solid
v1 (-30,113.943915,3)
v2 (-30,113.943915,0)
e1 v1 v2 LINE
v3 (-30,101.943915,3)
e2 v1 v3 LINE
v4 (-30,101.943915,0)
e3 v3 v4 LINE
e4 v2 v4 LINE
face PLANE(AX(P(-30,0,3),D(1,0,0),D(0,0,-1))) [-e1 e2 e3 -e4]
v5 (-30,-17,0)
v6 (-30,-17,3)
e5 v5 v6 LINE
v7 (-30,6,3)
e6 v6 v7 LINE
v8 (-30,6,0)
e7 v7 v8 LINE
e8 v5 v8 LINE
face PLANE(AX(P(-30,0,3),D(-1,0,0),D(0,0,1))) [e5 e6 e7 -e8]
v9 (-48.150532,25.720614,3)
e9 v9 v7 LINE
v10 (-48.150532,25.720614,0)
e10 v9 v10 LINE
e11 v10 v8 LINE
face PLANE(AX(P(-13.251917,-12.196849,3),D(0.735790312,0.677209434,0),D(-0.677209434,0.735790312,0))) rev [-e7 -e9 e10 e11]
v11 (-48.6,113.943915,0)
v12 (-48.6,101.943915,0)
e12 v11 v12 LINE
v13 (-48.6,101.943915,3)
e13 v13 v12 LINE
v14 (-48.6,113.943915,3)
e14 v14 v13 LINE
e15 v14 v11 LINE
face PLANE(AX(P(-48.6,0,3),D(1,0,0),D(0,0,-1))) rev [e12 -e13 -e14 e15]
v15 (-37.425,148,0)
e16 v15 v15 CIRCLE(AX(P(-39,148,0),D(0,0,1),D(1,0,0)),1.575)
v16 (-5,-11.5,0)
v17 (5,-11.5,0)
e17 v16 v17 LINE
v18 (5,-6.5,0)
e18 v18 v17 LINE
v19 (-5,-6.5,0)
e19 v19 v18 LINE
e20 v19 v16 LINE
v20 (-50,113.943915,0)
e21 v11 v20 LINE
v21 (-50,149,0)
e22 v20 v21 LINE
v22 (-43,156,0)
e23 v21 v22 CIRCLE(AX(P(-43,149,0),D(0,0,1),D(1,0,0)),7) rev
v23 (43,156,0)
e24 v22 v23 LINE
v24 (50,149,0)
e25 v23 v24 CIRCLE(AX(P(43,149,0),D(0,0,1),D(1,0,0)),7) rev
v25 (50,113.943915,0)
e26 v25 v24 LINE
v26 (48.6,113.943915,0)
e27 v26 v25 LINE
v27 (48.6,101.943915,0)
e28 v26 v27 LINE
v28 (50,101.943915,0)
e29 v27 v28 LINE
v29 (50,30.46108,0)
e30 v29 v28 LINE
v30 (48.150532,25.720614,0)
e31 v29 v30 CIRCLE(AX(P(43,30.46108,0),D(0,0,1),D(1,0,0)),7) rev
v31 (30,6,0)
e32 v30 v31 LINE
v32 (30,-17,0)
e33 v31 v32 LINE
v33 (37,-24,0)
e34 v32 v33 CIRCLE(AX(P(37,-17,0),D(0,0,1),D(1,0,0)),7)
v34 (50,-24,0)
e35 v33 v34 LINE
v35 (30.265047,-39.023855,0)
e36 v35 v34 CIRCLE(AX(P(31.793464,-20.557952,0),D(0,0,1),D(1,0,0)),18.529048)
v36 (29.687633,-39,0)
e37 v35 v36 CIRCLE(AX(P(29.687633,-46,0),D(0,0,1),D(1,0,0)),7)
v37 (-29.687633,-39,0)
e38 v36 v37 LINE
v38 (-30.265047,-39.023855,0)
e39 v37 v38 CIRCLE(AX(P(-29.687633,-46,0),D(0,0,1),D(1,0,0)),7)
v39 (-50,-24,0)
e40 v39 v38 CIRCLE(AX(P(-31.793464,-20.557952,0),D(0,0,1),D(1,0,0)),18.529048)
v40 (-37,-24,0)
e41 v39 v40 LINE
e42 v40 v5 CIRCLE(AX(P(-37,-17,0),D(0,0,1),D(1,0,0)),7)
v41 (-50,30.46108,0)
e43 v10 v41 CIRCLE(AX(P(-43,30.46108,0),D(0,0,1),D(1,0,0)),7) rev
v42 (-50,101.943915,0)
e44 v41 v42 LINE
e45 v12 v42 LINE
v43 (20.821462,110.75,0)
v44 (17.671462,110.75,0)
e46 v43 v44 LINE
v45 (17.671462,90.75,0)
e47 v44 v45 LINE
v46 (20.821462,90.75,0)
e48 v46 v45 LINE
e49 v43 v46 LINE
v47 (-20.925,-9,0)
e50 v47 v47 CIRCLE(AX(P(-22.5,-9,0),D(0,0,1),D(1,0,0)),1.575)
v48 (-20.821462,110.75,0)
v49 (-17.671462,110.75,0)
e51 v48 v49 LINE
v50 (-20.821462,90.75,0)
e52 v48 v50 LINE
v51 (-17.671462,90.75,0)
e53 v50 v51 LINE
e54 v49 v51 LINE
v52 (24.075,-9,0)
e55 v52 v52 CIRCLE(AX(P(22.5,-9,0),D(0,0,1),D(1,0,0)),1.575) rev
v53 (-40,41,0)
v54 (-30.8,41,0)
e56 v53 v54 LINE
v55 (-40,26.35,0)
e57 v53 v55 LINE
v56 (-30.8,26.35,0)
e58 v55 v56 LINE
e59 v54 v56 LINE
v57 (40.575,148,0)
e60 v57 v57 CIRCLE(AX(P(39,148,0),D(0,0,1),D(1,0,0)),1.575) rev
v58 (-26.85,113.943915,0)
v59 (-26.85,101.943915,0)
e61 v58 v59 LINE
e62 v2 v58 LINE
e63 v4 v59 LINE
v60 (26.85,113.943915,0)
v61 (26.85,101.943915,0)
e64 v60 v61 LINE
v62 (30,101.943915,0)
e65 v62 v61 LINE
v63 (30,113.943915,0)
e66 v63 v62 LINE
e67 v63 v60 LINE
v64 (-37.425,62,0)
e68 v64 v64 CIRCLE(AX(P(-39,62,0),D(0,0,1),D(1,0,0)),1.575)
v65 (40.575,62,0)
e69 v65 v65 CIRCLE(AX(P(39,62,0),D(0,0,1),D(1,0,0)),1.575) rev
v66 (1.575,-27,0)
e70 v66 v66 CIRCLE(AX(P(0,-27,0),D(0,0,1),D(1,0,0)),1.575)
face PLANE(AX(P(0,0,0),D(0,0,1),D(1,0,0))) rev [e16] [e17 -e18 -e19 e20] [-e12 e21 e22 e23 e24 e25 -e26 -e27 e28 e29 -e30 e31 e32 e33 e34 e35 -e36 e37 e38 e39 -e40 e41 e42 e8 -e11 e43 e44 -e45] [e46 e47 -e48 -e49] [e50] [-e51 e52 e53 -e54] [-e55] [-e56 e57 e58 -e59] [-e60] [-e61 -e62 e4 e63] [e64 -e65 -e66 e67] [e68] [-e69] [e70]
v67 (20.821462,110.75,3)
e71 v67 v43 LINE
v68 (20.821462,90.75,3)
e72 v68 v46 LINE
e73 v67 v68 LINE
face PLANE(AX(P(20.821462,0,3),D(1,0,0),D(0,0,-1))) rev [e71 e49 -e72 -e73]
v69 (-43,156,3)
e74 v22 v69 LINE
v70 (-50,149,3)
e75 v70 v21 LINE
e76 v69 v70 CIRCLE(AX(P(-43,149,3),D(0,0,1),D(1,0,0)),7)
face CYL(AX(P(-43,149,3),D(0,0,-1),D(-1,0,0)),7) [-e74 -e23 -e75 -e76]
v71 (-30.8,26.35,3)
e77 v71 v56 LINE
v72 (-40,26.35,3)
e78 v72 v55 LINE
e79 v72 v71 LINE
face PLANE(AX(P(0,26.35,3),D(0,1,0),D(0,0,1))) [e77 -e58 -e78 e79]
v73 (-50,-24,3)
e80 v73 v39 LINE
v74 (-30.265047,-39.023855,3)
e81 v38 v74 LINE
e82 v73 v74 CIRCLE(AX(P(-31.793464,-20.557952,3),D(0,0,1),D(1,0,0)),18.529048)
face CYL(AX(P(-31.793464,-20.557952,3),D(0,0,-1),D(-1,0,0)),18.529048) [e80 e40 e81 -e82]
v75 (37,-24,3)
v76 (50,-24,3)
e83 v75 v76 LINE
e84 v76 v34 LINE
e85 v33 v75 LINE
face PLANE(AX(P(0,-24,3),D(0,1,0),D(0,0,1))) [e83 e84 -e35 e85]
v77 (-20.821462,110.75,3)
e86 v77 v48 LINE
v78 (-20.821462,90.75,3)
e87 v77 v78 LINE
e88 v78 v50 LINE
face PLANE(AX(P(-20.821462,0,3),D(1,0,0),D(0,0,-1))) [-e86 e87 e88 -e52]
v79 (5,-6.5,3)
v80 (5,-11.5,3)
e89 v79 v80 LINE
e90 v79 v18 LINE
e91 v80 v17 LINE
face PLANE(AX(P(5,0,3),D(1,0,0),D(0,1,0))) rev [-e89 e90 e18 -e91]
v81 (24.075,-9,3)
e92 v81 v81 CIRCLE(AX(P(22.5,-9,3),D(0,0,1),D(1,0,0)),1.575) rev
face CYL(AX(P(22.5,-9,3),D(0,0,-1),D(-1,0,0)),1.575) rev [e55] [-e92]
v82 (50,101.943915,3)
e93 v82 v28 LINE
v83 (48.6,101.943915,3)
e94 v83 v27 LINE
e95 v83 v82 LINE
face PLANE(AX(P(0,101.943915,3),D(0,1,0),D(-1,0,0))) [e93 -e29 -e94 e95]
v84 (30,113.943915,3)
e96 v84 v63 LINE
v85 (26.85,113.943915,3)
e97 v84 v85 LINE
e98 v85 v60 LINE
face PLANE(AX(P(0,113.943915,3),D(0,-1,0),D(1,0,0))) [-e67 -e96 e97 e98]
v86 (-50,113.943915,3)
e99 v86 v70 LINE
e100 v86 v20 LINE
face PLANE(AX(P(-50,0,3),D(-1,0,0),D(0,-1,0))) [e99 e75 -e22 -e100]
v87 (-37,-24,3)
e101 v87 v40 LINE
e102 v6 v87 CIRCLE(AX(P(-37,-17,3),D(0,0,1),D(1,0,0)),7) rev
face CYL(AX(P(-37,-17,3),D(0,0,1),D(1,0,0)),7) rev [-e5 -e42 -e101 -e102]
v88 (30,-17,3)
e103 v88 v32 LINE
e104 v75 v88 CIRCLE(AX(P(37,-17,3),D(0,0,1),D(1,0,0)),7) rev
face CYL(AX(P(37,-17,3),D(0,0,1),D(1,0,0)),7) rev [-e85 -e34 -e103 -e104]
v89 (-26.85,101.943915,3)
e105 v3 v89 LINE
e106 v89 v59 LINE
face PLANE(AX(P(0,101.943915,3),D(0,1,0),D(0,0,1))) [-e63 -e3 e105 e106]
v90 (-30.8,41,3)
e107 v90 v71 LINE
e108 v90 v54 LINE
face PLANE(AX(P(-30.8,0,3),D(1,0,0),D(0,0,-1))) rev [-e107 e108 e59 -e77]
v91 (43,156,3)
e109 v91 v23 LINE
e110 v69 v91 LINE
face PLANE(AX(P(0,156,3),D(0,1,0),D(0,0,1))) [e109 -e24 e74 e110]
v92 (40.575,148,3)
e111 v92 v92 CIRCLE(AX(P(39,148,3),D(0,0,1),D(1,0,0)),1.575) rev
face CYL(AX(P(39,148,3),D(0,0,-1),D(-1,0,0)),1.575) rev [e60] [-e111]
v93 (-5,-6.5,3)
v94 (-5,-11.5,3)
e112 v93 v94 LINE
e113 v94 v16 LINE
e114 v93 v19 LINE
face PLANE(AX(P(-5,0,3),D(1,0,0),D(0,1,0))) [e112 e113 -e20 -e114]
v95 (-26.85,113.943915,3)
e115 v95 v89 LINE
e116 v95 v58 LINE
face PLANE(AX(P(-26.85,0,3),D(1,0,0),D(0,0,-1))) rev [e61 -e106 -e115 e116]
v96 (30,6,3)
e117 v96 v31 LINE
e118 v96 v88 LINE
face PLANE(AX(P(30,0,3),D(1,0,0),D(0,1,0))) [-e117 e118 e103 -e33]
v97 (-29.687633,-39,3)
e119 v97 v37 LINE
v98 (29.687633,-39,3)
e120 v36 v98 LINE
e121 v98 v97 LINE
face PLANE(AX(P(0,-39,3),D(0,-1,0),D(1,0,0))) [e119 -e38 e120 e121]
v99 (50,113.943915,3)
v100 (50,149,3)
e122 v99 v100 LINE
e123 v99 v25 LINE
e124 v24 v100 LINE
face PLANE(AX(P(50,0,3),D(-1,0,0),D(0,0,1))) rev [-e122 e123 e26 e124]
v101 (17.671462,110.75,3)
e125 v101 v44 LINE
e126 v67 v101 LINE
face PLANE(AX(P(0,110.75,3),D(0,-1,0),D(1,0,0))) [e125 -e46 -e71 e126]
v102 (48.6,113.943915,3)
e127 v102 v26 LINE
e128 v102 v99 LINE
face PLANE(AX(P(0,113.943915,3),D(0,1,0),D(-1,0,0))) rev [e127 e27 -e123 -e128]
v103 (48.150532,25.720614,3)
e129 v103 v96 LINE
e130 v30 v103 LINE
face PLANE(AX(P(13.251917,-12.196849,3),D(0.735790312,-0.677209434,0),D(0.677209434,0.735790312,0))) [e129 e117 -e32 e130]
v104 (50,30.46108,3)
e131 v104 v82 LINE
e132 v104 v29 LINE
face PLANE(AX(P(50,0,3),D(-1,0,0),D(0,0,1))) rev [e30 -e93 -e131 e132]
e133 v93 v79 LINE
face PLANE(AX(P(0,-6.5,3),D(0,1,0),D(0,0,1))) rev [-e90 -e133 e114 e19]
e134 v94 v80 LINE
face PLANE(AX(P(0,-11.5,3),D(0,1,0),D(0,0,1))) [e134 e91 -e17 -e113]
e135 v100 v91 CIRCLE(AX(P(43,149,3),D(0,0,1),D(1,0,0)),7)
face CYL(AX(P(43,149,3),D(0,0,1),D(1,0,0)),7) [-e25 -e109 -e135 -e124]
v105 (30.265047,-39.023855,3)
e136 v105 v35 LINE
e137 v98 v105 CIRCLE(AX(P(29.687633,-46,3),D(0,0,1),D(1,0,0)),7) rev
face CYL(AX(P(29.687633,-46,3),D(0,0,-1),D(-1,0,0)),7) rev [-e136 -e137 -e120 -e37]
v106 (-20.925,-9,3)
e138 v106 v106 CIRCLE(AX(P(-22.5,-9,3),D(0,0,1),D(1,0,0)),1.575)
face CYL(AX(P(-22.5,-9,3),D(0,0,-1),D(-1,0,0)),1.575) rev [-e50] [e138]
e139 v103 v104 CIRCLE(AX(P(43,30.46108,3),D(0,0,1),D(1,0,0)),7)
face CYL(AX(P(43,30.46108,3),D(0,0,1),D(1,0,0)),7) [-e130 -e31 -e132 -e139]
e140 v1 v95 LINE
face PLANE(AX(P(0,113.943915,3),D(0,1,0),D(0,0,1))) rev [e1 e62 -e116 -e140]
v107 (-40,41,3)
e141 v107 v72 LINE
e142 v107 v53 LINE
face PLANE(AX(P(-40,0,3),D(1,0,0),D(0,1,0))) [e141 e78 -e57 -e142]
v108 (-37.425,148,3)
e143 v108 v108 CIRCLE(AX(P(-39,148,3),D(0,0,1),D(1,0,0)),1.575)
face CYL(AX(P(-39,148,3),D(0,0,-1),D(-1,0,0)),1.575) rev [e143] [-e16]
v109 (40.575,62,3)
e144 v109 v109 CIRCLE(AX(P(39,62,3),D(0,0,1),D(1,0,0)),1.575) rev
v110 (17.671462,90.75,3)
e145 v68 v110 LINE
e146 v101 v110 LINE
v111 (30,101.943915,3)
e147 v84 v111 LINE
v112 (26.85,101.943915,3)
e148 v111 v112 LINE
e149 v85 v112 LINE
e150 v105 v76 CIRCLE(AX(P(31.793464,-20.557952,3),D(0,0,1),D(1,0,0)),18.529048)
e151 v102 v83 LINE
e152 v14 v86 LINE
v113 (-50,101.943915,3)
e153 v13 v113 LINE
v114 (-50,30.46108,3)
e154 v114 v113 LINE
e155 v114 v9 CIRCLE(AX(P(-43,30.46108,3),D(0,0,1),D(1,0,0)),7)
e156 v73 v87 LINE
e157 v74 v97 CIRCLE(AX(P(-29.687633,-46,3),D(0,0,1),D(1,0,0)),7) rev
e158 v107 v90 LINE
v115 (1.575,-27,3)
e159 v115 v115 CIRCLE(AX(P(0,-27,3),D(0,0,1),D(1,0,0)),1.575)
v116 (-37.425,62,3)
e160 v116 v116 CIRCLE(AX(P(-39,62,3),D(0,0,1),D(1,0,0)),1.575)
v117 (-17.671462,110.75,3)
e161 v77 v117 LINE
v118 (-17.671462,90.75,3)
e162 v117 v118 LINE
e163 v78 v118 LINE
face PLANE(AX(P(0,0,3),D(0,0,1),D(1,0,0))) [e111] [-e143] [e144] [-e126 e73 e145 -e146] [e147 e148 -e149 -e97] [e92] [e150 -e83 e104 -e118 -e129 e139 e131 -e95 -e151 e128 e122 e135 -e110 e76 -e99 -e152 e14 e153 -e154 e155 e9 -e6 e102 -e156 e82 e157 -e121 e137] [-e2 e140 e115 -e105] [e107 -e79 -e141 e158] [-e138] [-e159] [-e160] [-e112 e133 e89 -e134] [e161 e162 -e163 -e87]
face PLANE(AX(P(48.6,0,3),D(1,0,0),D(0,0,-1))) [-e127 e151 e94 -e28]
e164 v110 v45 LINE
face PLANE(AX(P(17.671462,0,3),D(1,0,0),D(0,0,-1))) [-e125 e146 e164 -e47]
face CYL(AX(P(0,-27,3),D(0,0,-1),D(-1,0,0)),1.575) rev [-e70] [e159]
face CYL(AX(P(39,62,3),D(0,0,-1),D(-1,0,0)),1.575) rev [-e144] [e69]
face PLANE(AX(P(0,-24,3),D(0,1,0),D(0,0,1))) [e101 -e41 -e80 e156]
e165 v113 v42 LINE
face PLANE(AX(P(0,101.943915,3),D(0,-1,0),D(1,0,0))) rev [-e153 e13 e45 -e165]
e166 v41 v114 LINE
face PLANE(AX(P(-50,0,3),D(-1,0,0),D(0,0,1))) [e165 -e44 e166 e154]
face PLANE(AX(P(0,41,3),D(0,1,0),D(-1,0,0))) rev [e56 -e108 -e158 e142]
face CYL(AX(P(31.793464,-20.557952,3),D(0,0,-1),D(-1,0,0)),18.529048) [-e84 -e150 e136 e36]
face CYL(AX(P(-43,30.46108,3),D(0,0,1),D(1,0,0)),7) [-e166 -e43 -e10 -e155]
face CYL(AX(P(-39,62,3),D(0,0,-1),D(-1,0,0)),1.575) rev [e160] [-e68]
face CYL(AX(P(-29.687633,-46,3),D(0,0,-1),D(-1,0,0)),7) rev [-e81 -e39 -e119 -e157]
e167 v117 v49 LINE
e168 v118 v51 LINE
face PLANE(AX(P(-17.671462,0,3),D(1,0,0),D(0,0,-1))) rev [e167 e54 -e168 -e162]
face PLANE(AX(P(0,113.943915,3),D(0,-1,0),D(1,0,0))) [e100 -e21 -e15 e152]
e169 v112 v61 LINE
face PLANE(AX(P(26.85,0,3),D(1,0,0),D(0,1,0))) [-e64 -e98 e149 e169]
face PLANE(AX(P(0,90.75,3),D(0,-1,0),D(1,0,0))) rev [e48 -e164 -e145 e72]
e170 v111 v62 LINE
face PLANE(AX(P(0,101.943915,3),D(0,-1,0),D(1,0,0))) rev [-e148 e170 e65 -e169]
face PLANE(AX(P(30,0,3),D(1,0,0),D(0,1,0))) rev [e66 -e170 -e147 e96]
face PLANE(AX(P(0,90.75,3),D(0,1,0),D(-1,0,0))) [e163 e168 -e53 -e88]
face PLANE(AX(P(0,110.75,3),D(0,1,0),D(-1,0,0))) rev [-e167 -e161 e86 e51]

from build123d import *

# Parameters (mm, degrees)
SKETCH1_W           = 9.2
SKETCH1_H           = 14.65
SKETCH1_R           = 1.575
SKETCH1_W_2         = 10
SKETCH1_H_2         = 5
SKETCH1_W_3         = 3.15
SKETCH1_H_3         = 20
SKETCH1_H_4         = 12
BOSS_EXTRUDE2_DEPTH = 3
FILLET1_R           = 7


with BuildPart() as part:
    # Sketch1 → Boss-Extrude2 (new body)
    with BuildSketch(Plane.XY):
        with BuildLine():
            Line((-30, -39), (30, -39))
            ThreePointArc((30, -39), (42.910893348, -35.38119113), (50, -24))
            Line((50, -24), (30, -24))
            Line((30, -24), (30, 6))
            Line((30, 6), (50, 27.730066792))
            Line((50, 27.730066792), (50, 101.943914812))
            Line((50, 101.943914812), (48.6, 101.943914812))
            Line((48.6, 101.943914812), (48.6, 113.943914812))
            Line((48.6, 113.943914812), (50, 113.943914812))
            Line((50, 113.943914812), (50, 156))
            Line((50, 156), (-50, 156))
            Line((-50, 156), (-50, 113.943914812))
            Line((-50, 113.943914812), (-48.6, 113.943914812))
            Line((-48.6, 113.943914812), (-48.6, 101.943914812))
            Line((-48.6, 101.943914812), (-50, 101.943914812))
            Line((-50, 101.943914812), (-50, 27.730066792))
            Line((-50, 27.730066792), (-30, 6))
            Line((-30, 6), (-30, -24))
            Line((-30, -24), (-50, -24))
            ThreePointArc((-50, -24), (-42.910893348, -35.38119113), (-30, -39))
        make_face()
        with Locations((-35.4, 33.675)):
            Rectangle(SKETCH1_W, SKETCH1_H, mode=Mode.SUBTRACT)
        with Locations((0, -27)):
            Circle(SKETCH1_R, mode=Mode.SUBTRACT)
        with Locations((22.5, -9)):
            Circle(SKETCH1_R, mode=Mode.SUBTRACT)
        with Locations((-22.5, -9)):
            Circle(SKETCH1_R, mode=Mode.SUBTRACT)
        with Locations((0, -9)):
            Rectangle(SKETCH1_W_2, SKETCH1_H_2, mode=Mode.SUBTRACT)
        with Locations((39, 148)):
            Circle(SKETCH1_R, mode=Mode.SUBTRACT)
        with Locations((-39, 62)):
            Circle(SKETCH1_R, mode=Mode.SUBTRACT)
        with Locations((-19.246461744, 100.75)):
            Rectangle(SKETCH1_W_3, SKETCH1_H_3, mode=Mode.SUBTRACT)
        with Locations((-28.425, 107.943914812)):
            Rectangle(SKETCH1_W_3, SKETCH1_H_4, mode=Mode.SUBTRACT)
        with Locations((-39, 148)):
            Circle(SKETCH1_R, mode=Mode.SUBTRACT)
        with Locations((19.246461744, 100.75)):
            Rectangle(SKETCH1_W_3, SKETCH1_H_3, mode=Mode.SUBTRACT)
        with Locations((39, 62)):
            Circle(SKETCH1_R, mode=Mode.SUBTRACT)
        with Locations((28.425, 107.943914812)):
            Rectangle(SKETCH1_W_3, SKETCH1_H_4, mode=Mode.SUBTRACT)
    extrude(amount=BOSS_EXTRUDE2_DEPTH)

    # Fillet1
    # the kernel refuses this fillet: 7 mm, written as the material it adds along each edge
    with BuildSketch(Plane(origin=(-30, -39, 0), x_dir=(1, 0, 0), z_dir=(0, 0, 1))) as fillet1_piece_1:
        with BuildLine():
            CenterArc((0.312366932, -7), FILLET1_R, 90, 4.731570596)
            ThreePointArc((-0.265046647, -0.023855394), (-0.132480496, -0.012403535), (0, 0))
            Line((0, 0), (0.312366932, 0))
        make_face()
    extrude(amount=3)
    with BuildSketch(Plane(origin=(-30, -24, 0), x_dir=(0, 1, 0), z_dir=(0, 0, 1)), Plane(origin=(30, -24, 0), x_dir=(1, 0, 0), z_dir=(0, 0, 1))) as fillet1_piece_2:
        with BuildLine():
            CenterArc((FILLET1_R, FILLET1_R), FILLET1_R, 180, 90)
            Line((0, FILLET1_R), (0, 0))
            Line((0, 0), (FILLET1_R, 0))
        make_face()
    extrude(amount=3)
    with BuildSketch(Plane(origin=(30, -39, 0), x_dir=(-1, 0, 0), z_dir=(0, 0, 1))) as fillet1_piece_3:
        with BuildLine():
            CenterArc((0.312366932, 7), FILLET1_R, 265.268429404, 4.731570596)
            ThreePointArc((-0.265046647, 0.023855394), (-0.132480496, 0.012403535), (0, 0))
            Line((0, 0), (0.312366932, 0))
        make_face()
    extrude(amount=3)
    # the kernel refuses this fillet: 7 mm, written as the material it takes off along each edge
    with BuildSketch(Plane(origin=(-50, 27.730066792, -6.827532689), x_dir=(0, 1, 0), z_dir=(0, 0, 1)), Plane(origin=(50, 27.730066792, -6.827532689), x_dir=(-0.6772094339211744, -0.7357903115753581, 0), z_dir=(0, 0, 1))) as fillet1_2_piece_1:
        with BuildLine():
            CenterArc((FILLET1_R * 0.390144725089, -FILLET1_R), FILLET1_R, 90, 42.625961352)
            Line((-FILLET1_R * 0.287064708832, -FILLET1_R * 0.264209688425), (0, 0))
            Line((0, 0), (FILLET1_R * 0.390144725089, 0))
        make_face()
    extrude(amount=16.655065378, mode=Mode.SUBTRACT)
    with BuildSketch(Plane(origin=(-50, 156, -17.5), x_dir=(1, 0, 0), z_dir=(0, 0, 1)), Plane(origin=(50, 156, -17.5), x_dir=(0, -1, 0), z_dir=(0, 0, 1))) as fillet1_2_piece_2:
        with BuildLine():
            CenterArc((FILLET1_R, -FILLET1_R), FILLET1_R, 90, 90)
            Line((0, -FILLET1_R), (0, 0))
            Line((0, 0), (FILLET1_R, 0))
        make_face()
    extrude(amount=38, mode=Mode.SUBTRACT)


solid = part.part
